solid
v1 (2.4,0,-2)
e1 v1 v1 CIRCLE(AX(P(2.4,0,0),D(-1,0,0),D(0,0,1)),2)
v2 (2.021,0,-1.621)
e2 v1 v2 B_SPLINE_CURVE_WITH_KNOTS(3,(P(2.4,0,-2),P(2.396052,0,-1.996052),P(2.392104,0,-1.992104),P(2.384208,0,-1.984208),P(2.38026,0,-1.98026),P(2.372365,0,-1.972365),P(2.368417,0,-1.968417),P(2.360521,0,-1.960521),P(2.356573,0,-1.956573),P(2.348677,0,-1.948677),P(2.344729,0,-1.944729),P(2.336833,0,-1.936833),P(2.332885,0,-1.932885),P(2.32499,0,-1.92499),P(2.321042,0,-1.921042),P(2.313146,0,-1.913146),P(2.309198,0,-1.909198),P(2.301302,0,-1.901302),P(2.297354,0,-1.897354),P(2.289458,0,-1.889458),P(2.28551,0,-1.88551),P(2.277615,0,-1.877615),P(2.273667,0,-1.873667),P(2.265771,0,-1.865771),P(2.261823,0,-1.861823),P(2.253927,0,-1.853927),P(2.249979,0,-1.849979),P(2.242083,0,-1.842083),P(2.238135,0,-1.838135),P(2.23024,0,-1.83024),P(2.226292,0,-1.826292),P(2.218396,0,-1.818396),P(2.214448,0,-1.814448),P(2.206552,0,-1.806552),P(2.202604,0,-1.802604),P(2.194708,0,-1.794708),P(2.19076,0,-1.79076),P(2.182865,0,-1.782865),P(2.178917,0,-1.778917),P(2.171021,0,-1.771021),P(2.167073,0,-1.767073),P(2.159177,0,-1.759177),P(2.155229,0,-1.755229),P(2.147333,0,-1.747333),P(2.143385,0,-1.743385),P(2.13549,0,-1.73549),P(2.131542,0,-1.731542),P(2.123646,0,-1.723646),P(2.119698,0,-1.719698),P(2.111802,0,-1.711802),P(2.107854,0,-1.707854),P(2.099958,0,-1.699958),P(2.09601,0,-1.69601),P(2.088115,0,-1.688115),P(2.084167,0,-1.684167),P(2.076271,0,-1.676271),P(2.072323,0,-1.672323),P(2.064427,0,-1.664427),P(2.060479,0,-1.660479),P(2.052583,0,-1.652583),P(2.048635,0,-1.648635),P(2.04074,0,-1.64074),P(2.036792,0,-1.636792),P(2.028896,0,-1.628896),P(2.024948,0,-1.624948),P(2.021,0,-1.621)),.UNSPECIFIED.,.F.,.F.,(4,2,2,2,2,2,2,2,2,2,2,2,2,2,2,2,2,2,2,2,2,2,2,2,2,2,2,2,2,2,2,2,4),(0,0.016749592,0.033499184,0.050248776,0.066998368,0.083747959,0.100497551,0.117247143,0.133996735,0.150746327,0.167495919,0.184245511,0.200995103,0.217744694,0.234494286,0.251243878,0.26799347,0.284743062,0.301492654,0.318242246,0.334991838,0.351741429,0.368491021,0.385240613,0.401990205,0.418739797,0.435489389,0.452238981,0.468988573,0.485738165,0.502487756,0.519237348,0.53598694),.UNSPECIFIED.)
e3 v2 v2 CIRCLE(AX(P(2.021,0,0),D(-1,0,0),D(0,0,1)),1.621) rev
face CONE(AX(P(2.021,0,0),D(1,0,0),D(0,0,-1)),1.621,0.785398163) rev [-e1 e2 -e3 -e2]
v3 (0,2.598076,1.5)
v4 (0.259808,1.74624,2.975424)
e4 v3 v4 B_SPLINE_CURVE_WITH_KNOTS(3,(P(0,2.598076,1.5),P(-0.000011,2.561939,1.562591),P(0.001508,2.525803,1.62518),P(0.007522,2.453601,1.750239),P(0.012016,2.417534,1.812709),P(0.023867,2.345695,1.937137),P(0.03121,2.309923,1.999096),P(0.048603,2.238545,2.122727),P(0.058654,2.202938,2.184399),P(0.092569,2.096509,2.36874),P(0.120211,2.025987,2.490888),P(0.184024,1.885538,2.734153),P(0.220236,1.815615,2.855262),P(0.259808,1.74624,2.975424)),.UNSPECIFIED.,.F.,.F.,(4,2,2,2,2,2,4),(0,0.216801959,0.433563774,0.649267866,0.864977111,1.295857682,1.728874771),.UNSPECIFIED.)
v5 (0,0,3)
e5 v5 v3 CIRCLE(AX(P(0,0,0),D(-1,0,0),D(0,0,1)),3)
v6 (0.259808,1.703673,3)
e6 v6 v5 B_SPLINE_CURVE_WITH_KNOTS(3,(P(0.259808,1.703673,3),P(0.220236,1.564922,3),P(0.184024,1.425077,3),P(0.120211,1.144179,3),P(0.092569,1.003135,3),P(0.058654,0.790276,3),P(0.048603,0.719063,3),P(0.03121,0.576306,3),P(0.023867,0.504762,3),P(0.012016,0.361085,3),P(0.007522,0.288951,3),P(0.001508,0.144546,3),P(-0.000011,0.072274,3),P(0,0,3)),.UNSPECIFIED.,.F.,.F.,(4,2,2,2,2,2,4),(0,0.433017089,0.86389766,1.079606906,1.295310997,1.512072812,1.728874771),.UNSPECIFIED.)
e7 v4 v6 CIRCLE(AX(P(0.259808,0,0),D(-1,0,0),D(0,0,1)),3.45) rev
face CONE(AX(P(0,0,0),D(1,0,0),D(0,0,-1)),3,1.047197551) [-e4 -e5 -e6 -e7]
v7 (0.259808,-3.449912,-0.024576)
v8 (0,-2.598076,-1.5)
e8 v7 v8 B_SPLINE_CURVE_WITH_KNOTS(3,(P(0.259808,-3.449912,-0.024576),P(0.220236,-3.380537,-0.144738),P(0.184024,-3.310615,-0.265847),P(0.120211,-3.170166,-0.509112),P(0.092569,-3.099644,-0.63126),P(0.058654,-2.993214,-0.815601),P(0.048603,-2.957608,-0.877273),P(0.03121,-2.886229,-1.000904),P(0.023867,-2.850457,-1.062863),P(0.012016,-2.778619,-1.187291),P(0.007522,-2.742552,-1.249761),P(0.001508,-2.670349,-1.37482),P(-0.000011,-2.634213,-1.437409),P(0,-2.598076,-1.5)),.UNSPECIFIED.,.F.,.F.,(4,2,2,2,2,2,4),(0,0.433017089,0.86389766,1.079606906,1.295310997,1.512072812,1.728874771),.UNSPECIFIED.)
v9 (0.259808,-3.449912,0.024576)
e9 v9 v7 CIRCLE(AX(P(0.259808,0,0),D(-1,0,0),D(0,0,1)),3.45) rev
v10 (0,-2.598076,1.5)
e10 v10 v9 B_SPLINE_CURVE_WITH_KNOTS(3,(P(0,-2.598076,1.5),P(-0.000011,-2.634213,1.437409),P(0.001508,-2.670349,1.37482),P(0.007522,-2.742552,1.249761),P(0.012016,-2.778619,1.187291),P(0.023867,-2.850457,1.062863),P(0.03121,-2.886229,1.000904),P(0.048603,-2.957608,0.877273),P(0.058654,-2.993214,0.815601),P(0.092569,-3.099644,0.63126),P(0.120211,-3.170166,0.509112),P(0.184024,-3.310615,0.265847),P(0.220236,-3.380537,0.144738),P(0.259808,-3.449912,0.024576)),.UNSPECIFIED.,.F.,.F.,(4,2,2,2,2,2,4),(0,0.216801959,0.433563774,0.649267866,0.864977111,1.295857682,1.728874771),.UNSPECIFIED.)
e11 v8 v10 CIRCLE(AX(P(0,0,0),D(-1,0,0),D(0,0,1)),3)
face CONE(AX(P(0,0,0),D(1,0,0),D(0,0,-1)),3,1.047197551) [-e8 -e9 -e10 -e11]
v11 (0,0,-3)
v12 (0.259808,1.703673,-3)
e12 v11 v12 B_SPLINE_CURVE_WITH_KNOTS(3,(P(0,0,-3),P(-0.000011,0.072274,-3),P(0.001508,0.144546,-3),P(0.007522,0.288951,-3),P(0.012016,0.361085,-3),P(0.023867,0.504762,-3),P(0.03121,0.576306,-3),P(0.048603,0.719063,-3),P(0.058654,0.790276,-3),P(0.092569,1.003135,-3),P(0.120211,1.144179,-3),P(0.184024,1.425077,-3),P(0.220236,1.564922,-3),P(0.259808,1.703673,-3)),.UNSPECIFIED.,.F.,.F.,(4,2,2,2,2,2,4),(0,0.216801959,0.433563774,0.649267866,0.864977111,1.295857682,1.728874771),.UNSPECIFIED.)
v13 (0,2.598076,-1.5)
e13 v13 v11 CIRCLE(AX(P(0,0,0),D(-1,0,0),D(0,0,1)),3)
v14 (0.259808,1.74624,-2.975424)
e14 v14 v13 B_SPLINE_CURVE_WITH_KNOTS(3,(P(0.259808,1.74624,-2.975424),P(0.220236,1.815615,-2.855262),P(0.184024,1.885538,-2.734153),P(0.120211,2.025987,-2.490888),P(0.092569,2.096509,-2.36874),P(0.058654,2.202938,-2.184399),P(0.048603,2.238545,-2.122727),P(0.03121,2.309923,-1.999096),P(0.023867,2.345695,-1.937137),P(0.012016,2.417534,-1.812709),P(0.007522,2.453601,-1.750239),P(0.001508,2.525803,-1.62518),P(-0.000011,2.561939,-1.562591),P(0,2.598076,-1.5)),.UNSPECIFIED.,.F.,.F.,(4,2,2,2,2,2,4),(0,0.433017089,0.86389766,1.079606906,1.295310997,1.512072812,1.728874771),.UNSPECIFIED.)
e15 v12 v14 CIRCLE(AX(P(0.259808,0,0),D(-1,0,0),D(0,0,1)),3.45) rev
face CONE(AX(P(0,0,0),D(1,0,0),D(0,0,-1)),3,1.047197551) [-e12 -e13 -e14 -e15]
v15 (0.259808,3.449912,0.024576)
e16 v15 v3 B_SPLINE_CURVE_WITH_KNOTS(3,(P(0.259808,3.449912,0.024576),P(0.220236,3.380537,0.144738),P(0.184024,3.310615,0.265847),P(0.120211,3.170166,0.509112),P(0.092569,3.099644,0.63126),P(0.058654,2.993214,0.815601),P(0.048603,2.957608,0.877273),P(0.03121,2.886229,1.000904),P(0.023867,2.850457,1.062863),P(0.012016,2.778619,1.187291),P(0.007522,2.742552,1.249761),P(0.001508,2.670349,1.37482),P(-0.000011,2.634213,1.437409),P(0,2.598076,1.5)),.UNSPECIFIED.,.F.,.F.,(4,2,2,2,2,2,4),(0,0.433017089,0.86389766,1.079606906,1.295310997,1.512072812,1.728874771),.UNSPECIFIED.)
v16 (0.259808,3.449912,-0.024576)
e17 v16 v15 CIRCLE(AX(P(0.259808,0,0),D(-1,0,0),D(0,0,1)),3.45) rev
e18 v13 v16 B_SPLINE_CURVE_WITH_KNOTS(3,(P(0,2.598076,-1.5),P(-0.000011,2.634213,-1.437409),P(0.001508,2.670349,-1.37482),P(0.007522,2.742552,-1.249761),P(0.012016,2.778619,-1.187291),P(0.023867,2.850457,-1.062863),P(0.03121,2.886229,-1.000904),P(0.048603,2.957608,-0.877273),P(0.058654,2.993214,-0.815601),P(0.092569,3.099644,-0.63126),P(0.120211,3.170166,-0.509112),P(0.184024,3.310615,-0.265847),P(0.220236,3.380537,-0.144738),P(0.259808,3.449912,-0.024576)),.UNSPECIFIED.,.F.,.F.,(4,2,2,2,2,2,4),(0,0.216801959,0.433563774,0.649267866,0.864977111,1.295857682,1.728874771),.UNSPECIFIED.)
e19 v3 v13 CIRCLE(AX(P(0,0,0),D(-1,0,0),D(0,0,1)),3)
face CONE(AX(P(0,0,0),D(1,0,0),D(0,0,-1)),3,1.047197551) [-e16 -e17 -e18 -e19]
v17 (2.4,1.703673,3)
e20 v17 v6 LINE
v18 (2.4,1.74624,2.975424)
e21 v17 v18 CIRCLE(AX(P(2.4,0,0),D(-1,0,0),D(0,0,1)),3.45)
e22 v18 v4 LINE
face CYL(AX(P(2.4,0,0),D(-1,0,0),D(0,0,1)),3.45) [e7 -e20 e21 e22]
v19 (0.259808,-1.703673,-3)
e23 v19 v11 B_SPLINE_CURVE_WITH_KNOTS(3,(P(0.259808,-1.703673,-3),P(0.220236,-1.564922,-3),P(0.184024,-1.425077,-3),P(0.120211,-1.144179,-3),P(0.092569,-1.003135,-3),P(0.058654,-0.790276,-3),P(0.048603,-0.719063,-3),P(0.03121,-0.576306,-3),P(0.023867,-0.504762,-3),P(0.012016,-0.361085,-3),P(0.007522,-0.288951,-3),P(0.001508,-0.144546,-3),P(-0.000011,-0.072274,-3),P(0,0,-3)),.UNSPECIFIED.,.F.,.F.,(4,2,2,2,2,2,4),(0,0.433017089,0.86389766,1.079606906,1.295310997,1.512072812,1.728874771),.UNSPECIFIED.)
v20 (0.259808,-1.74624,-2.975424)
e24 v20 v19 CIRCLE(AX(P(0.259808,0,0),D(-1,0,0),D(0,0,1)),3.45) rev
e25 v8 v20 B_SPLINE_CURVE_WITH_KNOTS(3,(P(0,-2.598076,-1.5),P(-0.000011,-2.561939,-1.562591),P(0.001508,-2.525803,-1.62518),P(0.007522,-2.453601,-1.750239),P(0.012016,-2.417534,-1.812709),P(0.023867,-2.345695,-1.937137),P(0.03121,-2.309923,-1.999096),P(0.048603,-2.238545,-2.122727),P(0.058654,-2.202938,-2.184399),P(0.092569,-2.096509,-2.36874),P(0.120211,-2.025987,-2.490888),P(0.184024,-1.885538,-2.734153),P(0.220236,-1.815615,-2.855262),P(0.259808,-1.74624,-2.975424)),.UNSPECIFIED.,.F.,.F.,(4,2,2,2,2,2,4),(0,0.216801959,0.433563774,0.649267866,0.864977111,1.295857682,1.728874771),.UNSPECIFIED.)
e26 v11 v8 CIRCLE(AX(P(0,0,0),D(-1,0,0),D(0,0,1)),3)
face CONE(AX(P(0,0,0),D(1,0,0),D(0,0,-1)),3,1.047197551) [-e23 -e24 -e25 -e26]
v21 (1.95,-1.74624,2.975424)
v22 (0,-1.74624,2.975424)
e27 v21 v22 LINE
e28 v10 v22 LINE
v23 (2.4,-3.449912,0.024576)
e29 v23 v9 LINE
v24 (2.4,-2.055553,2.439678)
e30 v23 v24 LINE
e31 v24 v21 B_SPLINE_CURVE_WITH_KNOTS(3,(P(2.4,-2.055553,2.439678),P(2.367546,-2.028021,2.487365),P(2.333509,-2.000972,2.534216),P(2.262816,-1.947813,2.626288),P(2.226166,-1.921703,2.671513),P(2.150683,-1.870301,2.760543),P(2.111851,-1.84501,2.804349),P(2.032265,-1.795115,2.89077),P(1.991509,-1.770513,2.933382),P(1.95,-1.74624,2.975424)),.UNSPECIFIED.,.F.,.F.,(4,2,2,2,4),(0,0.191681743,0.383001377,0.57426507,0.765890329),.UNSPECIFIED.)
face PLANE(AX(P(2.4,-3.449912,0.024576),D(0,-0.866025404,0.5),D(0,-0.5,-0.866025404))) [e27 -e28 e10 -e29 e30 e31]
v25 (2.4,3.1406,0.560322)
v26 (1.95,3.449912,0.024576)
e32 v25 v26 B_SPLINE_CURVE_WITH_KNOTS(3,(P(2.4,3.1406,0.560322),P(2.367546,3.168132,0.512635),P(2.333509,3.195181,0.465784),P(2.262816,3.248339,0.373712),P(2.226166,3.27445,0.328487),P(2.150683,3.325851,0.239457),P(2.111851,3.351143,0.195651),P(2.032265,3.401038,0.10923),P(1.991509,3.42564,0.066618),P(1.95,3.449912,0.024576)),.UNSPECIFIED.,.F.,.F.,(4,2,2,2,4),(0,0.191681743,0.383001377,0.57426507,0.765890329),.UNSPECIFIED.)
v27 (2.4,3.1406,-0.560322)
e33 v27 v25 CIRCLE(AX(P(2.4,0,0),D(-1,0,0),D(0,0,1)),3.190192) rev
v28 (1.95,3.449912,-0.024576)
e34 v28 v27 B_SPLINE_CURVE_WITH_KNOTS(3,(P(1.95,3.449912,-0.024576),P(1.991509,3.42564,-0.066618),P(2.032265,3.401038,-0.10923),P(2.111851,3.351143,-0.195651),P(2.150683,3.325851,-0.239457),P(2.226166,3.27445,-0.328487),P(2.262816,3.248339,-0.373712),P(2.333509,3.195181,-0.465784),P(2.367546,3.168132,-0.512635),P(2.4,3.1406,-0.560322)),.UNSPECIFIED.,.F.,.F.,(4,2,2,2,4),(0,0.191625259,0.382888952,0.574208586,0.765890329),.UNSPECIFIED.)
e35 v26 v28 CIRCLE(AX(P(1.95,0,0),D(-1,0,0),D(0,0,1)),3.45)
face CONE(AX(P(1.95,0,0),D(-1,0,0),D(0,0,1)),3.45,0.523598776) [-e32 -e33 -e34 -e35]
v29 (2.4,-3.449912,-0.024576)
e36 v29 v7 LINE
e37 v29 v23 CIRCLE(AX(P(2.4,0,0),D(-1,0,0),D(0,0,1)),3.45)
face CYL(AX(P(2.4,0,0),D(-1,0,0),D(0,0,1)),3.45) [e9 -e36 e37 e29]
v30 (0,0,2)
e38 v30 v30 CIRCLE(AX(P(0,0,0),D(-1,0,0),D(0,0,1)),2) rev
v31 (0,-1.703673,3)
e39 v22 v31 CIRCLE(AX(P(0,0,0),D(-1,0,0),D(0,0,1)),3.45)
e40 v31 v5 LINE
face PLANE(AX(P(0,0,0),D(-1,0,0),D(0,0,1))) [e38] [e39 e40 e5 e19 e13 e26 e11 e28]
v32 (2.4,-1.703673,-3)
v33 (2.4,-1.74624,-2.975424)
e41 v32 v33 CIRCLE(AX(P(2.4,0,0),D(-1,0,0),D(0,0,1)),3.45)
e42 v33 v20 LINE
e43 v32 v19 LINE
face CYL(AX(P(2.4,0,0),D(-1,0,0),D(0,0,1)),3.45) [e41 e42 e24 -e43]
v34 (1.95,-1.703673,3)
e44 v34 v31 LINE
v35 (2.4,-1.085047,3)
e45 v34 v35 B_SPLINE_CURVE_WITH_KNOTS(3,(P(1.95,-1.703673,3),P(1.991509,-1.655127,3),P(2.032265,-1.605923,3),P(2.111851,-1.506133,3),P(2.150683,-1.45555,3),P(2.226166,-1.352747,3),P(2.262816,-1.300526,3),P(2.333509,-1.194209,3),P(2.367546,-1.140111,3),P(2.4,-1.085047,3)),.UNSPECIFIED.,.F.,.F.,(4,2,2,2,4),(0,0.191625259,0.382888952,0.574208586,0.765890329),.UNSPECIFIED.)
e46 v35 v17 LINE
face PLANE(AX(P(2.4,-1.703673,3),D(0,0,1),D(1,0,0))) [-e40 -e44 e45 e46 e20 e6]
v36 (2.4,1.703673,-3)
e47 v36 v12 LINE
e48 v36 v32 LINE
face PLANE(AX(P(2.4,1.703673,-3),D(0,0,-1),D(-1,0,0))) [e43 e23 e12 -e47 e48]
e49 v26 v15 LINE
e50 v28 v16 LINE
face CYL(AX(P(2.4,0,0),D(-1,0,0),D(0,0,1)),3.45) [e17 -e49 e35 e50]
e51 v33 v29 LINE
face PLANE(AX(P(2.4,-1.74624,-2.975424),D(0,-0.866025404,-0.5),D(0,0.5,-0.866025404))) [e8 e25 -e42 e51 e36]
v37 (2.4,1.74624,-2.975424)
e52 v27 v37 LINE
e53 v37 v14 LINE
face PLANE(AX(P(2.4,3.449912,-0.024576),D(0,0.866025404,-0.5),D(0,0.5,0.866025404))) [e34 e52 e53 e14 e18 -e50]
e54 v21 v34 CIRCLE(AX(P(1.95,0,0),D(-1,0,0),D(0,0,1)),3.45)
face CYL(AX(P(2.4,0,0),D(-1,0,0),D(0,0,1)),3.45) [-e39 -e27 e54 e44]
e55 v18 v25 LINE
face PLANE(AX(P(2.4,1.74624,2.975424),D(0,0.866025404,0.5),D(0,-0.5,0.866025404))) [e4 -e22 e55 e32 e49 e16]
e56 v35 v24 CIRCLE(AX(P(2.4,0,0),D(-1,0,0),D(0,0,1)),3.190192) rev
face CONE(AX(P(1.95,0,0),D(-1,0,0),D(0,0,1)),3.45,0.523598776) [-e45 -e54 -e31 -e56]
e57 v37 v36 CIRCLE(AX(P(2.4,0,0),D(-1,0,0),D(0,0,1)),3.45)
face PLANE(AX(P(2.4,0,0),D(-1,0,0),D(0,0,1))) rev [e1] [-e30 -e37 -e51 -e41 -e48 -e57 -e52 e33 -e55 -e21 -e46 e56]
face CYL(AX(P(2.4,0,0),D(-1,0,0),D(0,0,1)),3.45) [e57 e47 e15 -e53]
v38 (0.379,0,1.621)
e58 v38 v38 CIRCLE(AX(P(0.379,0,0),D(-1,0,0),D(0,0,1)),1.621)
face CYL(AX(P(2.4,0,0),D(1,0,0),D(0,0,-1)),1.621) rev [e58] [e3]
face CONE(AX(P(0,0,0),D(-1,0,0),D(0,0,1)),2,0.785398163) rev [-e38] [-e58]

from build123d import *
from OCP.BRepFilletAPI import BRepFilletAPI_MakeChamfer

# Parameters (mm, degrees)
EXTRUDE_1_DEPTH    = 2.4
HOLE_WIZARD_M3_1_D = 3.242
CHAMFER_1_SIZE     = 0.45
CHAMFER_1_SIZE_2   = 0.259807621
CHAMFER_3_SIZE     = 0.379


with BuildPart() as part:
    # 草圖1 → 填料-伸長1 (new body)
    with BuildSketch(Plane(origin=(0, 0, 0), x_dir=(0, -1, 0), z_dir=(-1, 0, 0))):
        with BuildLine():
            Line((-1.746239959, 2.975423668), (-3.449912463, 0.024576332))
            ThreePointArc((-3.449912463, 0.024576332), (-3.45, 0), (-3.449912463, -0.024576332))
            Line((-3.449912463, -0.024576332), (-1.746239959, -2.975423668))
            ThreePointArc((-1.746239959, -2.975423668), (-1.725, -2.987787643), (-1.703672504, -3))
            Line((-1.703672504, -3), (1.703672504, -3))
            ThreePointArc((1.703672504, -3), (1.725, -2.987787643), (1.746239959, -2.975423668))
            Line((1.746239959, -2.975423668), (3.449912463, -0.024576332))
            ThreePointArc((3.449912463, -0.024576332), (3.45, 0), (3.449912463, 0.024576332))
            Line((3.449912463, 0.024576332), (1.746239959, 2.975423668))
            ThreePointArc((1.746239959, 2.975423668), (1.725, 2.987787643), (1.703672504, 3))
            Line((1.703672504, 3), (-1.703672504, 3))
            ThreePointArc((-1.703672504, 3), (-1.725, 2.987787643), (-1.746239959, 2.975423668))
        make_face()
    extrude(amount=-EXTRUDE_1_DEPTH)

    # M3 餘隙孔1 (through all)
    with Locations(Plane(origin=(2.4, 0, 0), x_dir=(0, 0, -1), z_dir=(1, 0, 0))):
        with Locations((0, 0)):
            Hole(HOLE_WIZARD_M3_1_D / 2)

    # 導角1
    chamfer_1_edges_1 = [part.edges().sort_by_distance(p)[0] for p in [
        (0, -3.45, 0),
    ]]
    chamfer_1_side_1 = [part.faces().sort_by_distance(p)[0] for p in [
        (0, -3.444803848, 0),
    ]]
    chamfer_1_edges_2 = [part.edges().sort_by_distance(p)[0] for p in [
        (0, 1.725, 2.987787643),
    ]]
    chamfer_1_side_2 = [part.faces().sort_by_distance(p)[0] for p in [
        (0.005196152, 1.725, 2.987787643),
    ]]
    chamfer_1_edges_3 = [part.edges().sort_by_distance(p)[0] for p in [
        (0, 3.45, 0),
    ]]
    chamfer_1_side_3 = [part.faces().sort_by_distance(p)[0] for p in [
        (0, 3.444803848, 0),
    ]]
    chamfer_1_edges_4 = [part.edges().sort_by_distance(p)[0] for p in [
        (0, 1.725, -2.987787643),
    ]]
    chamfer_1_side_4 = [part.faces().sort_by_distance(p)[0] for p in [
        (0, 1.722401924, -2.983287643),
    ]]
    chamfer_1_edges_5 = [part.edges().sort_by_distance(p)[0] for p in [
        (0, -1.725, -2.987787643),
    ]]
    chamfer_1_side_5 = [part.faces().sort_by_distance(p)[0] for p in [
        (0, -1.722401924, -2.983287643),
    ]]
    chamfer_1_edges_6 = [part.edges().sort_by_distance(p)[0] for p in [
        (2.4, -1.725, 2.987787643),
    ]]
    chamfer_1_side_6 = [part.faces().sort_by_distance(p)[0] for p in [
        (2.4, -1.722401924, 2.983287643),
    ]]
    chamfer_1_edges_7 = [part.edges().sort_by_distance(p)[0] for p in [
        (2.4, 3.45, 0),
    ]]
    chamfer_1_side_7 = [part.faces().sort_by_distance(p)[0] for p in [
        (2.4, 3.444803848, 0),
    ]]
    chamfer_1 = BRepFilletAPI_MakeChamfer(part.part.solid().wrapped)
    for e in chamfer_1_edges_1:
        chamfer_1.Add(CHAMFER_1_SIZE - 0.0001, CHAMFER_1_SIZE_2 - 0.0001, e.wrapped, chamfer_1_side_1[0].wrapped)
    for e in chamfer_1_edges_2:
        chamfer_1.Add(CHAMFER_1_SIZE_2 - 0.0001, CHAMFER_1_SIZE - 0.0001, e.wrapped, chamfer_1_side_2[0].wrapped)
    for e in chamfer_1_edges_3:
        chamfer_1.Add(CHAMFER_1_SIZE - 0.0001, CHAMFER_1_SIZE_2 - 0.0001, e.wrapped, chamfer_1_side_3[0].wrapped)
    for e in chamfer_1_edges_4:
        chamfer_1.Add(CHAMFER_1_SIZE - 0.0001, CHAMFER_1_SIZE_2 - 0.0001, e.wrapped, chamfer_1_side_4[0].wrapped)
    for e in chamfer_1_edges_5:
        chamfer_1.Add(CHAMFER_1_SIZE - 0.0001, CHAMFER_1_SIZE_2 - 0.0001, e.wrapped, chamfer_1_side_5[0].wrapped)
    for e in chamfer_1_edges_6:
        chamfer_1.Add(CHAMFER_1_SIZE_2 - 0.0001, CHAMFER_1_SIZE - 0.0001, e.wrapped, chamfer_1_side_6[0].wrapped)
    for e in chamfer_1_edges_7:
        chamfer_1.Add(CHAMFER_1_SIZE_2 - 0.0001, CHAMFER_1_SIZE - 0.0001, e.wrapped, chamfer_1_side_7[0].wrapped)
    add(Compound.cast(chamfer_1.Shape()), mode=Mode.REPLACE)  # a hair under: the kernel refuses the full size

    # 導角3
    chamfer_3_edges = [part.edges().sort_by_distance(p)[0] for p in [
        (2.4, 0, -1.621),
        (0, 0, -1.621),
    ]]
    chamfer(chamfer_3_edges, length=CHAMFER_3_SIZE)


solid = part.part
